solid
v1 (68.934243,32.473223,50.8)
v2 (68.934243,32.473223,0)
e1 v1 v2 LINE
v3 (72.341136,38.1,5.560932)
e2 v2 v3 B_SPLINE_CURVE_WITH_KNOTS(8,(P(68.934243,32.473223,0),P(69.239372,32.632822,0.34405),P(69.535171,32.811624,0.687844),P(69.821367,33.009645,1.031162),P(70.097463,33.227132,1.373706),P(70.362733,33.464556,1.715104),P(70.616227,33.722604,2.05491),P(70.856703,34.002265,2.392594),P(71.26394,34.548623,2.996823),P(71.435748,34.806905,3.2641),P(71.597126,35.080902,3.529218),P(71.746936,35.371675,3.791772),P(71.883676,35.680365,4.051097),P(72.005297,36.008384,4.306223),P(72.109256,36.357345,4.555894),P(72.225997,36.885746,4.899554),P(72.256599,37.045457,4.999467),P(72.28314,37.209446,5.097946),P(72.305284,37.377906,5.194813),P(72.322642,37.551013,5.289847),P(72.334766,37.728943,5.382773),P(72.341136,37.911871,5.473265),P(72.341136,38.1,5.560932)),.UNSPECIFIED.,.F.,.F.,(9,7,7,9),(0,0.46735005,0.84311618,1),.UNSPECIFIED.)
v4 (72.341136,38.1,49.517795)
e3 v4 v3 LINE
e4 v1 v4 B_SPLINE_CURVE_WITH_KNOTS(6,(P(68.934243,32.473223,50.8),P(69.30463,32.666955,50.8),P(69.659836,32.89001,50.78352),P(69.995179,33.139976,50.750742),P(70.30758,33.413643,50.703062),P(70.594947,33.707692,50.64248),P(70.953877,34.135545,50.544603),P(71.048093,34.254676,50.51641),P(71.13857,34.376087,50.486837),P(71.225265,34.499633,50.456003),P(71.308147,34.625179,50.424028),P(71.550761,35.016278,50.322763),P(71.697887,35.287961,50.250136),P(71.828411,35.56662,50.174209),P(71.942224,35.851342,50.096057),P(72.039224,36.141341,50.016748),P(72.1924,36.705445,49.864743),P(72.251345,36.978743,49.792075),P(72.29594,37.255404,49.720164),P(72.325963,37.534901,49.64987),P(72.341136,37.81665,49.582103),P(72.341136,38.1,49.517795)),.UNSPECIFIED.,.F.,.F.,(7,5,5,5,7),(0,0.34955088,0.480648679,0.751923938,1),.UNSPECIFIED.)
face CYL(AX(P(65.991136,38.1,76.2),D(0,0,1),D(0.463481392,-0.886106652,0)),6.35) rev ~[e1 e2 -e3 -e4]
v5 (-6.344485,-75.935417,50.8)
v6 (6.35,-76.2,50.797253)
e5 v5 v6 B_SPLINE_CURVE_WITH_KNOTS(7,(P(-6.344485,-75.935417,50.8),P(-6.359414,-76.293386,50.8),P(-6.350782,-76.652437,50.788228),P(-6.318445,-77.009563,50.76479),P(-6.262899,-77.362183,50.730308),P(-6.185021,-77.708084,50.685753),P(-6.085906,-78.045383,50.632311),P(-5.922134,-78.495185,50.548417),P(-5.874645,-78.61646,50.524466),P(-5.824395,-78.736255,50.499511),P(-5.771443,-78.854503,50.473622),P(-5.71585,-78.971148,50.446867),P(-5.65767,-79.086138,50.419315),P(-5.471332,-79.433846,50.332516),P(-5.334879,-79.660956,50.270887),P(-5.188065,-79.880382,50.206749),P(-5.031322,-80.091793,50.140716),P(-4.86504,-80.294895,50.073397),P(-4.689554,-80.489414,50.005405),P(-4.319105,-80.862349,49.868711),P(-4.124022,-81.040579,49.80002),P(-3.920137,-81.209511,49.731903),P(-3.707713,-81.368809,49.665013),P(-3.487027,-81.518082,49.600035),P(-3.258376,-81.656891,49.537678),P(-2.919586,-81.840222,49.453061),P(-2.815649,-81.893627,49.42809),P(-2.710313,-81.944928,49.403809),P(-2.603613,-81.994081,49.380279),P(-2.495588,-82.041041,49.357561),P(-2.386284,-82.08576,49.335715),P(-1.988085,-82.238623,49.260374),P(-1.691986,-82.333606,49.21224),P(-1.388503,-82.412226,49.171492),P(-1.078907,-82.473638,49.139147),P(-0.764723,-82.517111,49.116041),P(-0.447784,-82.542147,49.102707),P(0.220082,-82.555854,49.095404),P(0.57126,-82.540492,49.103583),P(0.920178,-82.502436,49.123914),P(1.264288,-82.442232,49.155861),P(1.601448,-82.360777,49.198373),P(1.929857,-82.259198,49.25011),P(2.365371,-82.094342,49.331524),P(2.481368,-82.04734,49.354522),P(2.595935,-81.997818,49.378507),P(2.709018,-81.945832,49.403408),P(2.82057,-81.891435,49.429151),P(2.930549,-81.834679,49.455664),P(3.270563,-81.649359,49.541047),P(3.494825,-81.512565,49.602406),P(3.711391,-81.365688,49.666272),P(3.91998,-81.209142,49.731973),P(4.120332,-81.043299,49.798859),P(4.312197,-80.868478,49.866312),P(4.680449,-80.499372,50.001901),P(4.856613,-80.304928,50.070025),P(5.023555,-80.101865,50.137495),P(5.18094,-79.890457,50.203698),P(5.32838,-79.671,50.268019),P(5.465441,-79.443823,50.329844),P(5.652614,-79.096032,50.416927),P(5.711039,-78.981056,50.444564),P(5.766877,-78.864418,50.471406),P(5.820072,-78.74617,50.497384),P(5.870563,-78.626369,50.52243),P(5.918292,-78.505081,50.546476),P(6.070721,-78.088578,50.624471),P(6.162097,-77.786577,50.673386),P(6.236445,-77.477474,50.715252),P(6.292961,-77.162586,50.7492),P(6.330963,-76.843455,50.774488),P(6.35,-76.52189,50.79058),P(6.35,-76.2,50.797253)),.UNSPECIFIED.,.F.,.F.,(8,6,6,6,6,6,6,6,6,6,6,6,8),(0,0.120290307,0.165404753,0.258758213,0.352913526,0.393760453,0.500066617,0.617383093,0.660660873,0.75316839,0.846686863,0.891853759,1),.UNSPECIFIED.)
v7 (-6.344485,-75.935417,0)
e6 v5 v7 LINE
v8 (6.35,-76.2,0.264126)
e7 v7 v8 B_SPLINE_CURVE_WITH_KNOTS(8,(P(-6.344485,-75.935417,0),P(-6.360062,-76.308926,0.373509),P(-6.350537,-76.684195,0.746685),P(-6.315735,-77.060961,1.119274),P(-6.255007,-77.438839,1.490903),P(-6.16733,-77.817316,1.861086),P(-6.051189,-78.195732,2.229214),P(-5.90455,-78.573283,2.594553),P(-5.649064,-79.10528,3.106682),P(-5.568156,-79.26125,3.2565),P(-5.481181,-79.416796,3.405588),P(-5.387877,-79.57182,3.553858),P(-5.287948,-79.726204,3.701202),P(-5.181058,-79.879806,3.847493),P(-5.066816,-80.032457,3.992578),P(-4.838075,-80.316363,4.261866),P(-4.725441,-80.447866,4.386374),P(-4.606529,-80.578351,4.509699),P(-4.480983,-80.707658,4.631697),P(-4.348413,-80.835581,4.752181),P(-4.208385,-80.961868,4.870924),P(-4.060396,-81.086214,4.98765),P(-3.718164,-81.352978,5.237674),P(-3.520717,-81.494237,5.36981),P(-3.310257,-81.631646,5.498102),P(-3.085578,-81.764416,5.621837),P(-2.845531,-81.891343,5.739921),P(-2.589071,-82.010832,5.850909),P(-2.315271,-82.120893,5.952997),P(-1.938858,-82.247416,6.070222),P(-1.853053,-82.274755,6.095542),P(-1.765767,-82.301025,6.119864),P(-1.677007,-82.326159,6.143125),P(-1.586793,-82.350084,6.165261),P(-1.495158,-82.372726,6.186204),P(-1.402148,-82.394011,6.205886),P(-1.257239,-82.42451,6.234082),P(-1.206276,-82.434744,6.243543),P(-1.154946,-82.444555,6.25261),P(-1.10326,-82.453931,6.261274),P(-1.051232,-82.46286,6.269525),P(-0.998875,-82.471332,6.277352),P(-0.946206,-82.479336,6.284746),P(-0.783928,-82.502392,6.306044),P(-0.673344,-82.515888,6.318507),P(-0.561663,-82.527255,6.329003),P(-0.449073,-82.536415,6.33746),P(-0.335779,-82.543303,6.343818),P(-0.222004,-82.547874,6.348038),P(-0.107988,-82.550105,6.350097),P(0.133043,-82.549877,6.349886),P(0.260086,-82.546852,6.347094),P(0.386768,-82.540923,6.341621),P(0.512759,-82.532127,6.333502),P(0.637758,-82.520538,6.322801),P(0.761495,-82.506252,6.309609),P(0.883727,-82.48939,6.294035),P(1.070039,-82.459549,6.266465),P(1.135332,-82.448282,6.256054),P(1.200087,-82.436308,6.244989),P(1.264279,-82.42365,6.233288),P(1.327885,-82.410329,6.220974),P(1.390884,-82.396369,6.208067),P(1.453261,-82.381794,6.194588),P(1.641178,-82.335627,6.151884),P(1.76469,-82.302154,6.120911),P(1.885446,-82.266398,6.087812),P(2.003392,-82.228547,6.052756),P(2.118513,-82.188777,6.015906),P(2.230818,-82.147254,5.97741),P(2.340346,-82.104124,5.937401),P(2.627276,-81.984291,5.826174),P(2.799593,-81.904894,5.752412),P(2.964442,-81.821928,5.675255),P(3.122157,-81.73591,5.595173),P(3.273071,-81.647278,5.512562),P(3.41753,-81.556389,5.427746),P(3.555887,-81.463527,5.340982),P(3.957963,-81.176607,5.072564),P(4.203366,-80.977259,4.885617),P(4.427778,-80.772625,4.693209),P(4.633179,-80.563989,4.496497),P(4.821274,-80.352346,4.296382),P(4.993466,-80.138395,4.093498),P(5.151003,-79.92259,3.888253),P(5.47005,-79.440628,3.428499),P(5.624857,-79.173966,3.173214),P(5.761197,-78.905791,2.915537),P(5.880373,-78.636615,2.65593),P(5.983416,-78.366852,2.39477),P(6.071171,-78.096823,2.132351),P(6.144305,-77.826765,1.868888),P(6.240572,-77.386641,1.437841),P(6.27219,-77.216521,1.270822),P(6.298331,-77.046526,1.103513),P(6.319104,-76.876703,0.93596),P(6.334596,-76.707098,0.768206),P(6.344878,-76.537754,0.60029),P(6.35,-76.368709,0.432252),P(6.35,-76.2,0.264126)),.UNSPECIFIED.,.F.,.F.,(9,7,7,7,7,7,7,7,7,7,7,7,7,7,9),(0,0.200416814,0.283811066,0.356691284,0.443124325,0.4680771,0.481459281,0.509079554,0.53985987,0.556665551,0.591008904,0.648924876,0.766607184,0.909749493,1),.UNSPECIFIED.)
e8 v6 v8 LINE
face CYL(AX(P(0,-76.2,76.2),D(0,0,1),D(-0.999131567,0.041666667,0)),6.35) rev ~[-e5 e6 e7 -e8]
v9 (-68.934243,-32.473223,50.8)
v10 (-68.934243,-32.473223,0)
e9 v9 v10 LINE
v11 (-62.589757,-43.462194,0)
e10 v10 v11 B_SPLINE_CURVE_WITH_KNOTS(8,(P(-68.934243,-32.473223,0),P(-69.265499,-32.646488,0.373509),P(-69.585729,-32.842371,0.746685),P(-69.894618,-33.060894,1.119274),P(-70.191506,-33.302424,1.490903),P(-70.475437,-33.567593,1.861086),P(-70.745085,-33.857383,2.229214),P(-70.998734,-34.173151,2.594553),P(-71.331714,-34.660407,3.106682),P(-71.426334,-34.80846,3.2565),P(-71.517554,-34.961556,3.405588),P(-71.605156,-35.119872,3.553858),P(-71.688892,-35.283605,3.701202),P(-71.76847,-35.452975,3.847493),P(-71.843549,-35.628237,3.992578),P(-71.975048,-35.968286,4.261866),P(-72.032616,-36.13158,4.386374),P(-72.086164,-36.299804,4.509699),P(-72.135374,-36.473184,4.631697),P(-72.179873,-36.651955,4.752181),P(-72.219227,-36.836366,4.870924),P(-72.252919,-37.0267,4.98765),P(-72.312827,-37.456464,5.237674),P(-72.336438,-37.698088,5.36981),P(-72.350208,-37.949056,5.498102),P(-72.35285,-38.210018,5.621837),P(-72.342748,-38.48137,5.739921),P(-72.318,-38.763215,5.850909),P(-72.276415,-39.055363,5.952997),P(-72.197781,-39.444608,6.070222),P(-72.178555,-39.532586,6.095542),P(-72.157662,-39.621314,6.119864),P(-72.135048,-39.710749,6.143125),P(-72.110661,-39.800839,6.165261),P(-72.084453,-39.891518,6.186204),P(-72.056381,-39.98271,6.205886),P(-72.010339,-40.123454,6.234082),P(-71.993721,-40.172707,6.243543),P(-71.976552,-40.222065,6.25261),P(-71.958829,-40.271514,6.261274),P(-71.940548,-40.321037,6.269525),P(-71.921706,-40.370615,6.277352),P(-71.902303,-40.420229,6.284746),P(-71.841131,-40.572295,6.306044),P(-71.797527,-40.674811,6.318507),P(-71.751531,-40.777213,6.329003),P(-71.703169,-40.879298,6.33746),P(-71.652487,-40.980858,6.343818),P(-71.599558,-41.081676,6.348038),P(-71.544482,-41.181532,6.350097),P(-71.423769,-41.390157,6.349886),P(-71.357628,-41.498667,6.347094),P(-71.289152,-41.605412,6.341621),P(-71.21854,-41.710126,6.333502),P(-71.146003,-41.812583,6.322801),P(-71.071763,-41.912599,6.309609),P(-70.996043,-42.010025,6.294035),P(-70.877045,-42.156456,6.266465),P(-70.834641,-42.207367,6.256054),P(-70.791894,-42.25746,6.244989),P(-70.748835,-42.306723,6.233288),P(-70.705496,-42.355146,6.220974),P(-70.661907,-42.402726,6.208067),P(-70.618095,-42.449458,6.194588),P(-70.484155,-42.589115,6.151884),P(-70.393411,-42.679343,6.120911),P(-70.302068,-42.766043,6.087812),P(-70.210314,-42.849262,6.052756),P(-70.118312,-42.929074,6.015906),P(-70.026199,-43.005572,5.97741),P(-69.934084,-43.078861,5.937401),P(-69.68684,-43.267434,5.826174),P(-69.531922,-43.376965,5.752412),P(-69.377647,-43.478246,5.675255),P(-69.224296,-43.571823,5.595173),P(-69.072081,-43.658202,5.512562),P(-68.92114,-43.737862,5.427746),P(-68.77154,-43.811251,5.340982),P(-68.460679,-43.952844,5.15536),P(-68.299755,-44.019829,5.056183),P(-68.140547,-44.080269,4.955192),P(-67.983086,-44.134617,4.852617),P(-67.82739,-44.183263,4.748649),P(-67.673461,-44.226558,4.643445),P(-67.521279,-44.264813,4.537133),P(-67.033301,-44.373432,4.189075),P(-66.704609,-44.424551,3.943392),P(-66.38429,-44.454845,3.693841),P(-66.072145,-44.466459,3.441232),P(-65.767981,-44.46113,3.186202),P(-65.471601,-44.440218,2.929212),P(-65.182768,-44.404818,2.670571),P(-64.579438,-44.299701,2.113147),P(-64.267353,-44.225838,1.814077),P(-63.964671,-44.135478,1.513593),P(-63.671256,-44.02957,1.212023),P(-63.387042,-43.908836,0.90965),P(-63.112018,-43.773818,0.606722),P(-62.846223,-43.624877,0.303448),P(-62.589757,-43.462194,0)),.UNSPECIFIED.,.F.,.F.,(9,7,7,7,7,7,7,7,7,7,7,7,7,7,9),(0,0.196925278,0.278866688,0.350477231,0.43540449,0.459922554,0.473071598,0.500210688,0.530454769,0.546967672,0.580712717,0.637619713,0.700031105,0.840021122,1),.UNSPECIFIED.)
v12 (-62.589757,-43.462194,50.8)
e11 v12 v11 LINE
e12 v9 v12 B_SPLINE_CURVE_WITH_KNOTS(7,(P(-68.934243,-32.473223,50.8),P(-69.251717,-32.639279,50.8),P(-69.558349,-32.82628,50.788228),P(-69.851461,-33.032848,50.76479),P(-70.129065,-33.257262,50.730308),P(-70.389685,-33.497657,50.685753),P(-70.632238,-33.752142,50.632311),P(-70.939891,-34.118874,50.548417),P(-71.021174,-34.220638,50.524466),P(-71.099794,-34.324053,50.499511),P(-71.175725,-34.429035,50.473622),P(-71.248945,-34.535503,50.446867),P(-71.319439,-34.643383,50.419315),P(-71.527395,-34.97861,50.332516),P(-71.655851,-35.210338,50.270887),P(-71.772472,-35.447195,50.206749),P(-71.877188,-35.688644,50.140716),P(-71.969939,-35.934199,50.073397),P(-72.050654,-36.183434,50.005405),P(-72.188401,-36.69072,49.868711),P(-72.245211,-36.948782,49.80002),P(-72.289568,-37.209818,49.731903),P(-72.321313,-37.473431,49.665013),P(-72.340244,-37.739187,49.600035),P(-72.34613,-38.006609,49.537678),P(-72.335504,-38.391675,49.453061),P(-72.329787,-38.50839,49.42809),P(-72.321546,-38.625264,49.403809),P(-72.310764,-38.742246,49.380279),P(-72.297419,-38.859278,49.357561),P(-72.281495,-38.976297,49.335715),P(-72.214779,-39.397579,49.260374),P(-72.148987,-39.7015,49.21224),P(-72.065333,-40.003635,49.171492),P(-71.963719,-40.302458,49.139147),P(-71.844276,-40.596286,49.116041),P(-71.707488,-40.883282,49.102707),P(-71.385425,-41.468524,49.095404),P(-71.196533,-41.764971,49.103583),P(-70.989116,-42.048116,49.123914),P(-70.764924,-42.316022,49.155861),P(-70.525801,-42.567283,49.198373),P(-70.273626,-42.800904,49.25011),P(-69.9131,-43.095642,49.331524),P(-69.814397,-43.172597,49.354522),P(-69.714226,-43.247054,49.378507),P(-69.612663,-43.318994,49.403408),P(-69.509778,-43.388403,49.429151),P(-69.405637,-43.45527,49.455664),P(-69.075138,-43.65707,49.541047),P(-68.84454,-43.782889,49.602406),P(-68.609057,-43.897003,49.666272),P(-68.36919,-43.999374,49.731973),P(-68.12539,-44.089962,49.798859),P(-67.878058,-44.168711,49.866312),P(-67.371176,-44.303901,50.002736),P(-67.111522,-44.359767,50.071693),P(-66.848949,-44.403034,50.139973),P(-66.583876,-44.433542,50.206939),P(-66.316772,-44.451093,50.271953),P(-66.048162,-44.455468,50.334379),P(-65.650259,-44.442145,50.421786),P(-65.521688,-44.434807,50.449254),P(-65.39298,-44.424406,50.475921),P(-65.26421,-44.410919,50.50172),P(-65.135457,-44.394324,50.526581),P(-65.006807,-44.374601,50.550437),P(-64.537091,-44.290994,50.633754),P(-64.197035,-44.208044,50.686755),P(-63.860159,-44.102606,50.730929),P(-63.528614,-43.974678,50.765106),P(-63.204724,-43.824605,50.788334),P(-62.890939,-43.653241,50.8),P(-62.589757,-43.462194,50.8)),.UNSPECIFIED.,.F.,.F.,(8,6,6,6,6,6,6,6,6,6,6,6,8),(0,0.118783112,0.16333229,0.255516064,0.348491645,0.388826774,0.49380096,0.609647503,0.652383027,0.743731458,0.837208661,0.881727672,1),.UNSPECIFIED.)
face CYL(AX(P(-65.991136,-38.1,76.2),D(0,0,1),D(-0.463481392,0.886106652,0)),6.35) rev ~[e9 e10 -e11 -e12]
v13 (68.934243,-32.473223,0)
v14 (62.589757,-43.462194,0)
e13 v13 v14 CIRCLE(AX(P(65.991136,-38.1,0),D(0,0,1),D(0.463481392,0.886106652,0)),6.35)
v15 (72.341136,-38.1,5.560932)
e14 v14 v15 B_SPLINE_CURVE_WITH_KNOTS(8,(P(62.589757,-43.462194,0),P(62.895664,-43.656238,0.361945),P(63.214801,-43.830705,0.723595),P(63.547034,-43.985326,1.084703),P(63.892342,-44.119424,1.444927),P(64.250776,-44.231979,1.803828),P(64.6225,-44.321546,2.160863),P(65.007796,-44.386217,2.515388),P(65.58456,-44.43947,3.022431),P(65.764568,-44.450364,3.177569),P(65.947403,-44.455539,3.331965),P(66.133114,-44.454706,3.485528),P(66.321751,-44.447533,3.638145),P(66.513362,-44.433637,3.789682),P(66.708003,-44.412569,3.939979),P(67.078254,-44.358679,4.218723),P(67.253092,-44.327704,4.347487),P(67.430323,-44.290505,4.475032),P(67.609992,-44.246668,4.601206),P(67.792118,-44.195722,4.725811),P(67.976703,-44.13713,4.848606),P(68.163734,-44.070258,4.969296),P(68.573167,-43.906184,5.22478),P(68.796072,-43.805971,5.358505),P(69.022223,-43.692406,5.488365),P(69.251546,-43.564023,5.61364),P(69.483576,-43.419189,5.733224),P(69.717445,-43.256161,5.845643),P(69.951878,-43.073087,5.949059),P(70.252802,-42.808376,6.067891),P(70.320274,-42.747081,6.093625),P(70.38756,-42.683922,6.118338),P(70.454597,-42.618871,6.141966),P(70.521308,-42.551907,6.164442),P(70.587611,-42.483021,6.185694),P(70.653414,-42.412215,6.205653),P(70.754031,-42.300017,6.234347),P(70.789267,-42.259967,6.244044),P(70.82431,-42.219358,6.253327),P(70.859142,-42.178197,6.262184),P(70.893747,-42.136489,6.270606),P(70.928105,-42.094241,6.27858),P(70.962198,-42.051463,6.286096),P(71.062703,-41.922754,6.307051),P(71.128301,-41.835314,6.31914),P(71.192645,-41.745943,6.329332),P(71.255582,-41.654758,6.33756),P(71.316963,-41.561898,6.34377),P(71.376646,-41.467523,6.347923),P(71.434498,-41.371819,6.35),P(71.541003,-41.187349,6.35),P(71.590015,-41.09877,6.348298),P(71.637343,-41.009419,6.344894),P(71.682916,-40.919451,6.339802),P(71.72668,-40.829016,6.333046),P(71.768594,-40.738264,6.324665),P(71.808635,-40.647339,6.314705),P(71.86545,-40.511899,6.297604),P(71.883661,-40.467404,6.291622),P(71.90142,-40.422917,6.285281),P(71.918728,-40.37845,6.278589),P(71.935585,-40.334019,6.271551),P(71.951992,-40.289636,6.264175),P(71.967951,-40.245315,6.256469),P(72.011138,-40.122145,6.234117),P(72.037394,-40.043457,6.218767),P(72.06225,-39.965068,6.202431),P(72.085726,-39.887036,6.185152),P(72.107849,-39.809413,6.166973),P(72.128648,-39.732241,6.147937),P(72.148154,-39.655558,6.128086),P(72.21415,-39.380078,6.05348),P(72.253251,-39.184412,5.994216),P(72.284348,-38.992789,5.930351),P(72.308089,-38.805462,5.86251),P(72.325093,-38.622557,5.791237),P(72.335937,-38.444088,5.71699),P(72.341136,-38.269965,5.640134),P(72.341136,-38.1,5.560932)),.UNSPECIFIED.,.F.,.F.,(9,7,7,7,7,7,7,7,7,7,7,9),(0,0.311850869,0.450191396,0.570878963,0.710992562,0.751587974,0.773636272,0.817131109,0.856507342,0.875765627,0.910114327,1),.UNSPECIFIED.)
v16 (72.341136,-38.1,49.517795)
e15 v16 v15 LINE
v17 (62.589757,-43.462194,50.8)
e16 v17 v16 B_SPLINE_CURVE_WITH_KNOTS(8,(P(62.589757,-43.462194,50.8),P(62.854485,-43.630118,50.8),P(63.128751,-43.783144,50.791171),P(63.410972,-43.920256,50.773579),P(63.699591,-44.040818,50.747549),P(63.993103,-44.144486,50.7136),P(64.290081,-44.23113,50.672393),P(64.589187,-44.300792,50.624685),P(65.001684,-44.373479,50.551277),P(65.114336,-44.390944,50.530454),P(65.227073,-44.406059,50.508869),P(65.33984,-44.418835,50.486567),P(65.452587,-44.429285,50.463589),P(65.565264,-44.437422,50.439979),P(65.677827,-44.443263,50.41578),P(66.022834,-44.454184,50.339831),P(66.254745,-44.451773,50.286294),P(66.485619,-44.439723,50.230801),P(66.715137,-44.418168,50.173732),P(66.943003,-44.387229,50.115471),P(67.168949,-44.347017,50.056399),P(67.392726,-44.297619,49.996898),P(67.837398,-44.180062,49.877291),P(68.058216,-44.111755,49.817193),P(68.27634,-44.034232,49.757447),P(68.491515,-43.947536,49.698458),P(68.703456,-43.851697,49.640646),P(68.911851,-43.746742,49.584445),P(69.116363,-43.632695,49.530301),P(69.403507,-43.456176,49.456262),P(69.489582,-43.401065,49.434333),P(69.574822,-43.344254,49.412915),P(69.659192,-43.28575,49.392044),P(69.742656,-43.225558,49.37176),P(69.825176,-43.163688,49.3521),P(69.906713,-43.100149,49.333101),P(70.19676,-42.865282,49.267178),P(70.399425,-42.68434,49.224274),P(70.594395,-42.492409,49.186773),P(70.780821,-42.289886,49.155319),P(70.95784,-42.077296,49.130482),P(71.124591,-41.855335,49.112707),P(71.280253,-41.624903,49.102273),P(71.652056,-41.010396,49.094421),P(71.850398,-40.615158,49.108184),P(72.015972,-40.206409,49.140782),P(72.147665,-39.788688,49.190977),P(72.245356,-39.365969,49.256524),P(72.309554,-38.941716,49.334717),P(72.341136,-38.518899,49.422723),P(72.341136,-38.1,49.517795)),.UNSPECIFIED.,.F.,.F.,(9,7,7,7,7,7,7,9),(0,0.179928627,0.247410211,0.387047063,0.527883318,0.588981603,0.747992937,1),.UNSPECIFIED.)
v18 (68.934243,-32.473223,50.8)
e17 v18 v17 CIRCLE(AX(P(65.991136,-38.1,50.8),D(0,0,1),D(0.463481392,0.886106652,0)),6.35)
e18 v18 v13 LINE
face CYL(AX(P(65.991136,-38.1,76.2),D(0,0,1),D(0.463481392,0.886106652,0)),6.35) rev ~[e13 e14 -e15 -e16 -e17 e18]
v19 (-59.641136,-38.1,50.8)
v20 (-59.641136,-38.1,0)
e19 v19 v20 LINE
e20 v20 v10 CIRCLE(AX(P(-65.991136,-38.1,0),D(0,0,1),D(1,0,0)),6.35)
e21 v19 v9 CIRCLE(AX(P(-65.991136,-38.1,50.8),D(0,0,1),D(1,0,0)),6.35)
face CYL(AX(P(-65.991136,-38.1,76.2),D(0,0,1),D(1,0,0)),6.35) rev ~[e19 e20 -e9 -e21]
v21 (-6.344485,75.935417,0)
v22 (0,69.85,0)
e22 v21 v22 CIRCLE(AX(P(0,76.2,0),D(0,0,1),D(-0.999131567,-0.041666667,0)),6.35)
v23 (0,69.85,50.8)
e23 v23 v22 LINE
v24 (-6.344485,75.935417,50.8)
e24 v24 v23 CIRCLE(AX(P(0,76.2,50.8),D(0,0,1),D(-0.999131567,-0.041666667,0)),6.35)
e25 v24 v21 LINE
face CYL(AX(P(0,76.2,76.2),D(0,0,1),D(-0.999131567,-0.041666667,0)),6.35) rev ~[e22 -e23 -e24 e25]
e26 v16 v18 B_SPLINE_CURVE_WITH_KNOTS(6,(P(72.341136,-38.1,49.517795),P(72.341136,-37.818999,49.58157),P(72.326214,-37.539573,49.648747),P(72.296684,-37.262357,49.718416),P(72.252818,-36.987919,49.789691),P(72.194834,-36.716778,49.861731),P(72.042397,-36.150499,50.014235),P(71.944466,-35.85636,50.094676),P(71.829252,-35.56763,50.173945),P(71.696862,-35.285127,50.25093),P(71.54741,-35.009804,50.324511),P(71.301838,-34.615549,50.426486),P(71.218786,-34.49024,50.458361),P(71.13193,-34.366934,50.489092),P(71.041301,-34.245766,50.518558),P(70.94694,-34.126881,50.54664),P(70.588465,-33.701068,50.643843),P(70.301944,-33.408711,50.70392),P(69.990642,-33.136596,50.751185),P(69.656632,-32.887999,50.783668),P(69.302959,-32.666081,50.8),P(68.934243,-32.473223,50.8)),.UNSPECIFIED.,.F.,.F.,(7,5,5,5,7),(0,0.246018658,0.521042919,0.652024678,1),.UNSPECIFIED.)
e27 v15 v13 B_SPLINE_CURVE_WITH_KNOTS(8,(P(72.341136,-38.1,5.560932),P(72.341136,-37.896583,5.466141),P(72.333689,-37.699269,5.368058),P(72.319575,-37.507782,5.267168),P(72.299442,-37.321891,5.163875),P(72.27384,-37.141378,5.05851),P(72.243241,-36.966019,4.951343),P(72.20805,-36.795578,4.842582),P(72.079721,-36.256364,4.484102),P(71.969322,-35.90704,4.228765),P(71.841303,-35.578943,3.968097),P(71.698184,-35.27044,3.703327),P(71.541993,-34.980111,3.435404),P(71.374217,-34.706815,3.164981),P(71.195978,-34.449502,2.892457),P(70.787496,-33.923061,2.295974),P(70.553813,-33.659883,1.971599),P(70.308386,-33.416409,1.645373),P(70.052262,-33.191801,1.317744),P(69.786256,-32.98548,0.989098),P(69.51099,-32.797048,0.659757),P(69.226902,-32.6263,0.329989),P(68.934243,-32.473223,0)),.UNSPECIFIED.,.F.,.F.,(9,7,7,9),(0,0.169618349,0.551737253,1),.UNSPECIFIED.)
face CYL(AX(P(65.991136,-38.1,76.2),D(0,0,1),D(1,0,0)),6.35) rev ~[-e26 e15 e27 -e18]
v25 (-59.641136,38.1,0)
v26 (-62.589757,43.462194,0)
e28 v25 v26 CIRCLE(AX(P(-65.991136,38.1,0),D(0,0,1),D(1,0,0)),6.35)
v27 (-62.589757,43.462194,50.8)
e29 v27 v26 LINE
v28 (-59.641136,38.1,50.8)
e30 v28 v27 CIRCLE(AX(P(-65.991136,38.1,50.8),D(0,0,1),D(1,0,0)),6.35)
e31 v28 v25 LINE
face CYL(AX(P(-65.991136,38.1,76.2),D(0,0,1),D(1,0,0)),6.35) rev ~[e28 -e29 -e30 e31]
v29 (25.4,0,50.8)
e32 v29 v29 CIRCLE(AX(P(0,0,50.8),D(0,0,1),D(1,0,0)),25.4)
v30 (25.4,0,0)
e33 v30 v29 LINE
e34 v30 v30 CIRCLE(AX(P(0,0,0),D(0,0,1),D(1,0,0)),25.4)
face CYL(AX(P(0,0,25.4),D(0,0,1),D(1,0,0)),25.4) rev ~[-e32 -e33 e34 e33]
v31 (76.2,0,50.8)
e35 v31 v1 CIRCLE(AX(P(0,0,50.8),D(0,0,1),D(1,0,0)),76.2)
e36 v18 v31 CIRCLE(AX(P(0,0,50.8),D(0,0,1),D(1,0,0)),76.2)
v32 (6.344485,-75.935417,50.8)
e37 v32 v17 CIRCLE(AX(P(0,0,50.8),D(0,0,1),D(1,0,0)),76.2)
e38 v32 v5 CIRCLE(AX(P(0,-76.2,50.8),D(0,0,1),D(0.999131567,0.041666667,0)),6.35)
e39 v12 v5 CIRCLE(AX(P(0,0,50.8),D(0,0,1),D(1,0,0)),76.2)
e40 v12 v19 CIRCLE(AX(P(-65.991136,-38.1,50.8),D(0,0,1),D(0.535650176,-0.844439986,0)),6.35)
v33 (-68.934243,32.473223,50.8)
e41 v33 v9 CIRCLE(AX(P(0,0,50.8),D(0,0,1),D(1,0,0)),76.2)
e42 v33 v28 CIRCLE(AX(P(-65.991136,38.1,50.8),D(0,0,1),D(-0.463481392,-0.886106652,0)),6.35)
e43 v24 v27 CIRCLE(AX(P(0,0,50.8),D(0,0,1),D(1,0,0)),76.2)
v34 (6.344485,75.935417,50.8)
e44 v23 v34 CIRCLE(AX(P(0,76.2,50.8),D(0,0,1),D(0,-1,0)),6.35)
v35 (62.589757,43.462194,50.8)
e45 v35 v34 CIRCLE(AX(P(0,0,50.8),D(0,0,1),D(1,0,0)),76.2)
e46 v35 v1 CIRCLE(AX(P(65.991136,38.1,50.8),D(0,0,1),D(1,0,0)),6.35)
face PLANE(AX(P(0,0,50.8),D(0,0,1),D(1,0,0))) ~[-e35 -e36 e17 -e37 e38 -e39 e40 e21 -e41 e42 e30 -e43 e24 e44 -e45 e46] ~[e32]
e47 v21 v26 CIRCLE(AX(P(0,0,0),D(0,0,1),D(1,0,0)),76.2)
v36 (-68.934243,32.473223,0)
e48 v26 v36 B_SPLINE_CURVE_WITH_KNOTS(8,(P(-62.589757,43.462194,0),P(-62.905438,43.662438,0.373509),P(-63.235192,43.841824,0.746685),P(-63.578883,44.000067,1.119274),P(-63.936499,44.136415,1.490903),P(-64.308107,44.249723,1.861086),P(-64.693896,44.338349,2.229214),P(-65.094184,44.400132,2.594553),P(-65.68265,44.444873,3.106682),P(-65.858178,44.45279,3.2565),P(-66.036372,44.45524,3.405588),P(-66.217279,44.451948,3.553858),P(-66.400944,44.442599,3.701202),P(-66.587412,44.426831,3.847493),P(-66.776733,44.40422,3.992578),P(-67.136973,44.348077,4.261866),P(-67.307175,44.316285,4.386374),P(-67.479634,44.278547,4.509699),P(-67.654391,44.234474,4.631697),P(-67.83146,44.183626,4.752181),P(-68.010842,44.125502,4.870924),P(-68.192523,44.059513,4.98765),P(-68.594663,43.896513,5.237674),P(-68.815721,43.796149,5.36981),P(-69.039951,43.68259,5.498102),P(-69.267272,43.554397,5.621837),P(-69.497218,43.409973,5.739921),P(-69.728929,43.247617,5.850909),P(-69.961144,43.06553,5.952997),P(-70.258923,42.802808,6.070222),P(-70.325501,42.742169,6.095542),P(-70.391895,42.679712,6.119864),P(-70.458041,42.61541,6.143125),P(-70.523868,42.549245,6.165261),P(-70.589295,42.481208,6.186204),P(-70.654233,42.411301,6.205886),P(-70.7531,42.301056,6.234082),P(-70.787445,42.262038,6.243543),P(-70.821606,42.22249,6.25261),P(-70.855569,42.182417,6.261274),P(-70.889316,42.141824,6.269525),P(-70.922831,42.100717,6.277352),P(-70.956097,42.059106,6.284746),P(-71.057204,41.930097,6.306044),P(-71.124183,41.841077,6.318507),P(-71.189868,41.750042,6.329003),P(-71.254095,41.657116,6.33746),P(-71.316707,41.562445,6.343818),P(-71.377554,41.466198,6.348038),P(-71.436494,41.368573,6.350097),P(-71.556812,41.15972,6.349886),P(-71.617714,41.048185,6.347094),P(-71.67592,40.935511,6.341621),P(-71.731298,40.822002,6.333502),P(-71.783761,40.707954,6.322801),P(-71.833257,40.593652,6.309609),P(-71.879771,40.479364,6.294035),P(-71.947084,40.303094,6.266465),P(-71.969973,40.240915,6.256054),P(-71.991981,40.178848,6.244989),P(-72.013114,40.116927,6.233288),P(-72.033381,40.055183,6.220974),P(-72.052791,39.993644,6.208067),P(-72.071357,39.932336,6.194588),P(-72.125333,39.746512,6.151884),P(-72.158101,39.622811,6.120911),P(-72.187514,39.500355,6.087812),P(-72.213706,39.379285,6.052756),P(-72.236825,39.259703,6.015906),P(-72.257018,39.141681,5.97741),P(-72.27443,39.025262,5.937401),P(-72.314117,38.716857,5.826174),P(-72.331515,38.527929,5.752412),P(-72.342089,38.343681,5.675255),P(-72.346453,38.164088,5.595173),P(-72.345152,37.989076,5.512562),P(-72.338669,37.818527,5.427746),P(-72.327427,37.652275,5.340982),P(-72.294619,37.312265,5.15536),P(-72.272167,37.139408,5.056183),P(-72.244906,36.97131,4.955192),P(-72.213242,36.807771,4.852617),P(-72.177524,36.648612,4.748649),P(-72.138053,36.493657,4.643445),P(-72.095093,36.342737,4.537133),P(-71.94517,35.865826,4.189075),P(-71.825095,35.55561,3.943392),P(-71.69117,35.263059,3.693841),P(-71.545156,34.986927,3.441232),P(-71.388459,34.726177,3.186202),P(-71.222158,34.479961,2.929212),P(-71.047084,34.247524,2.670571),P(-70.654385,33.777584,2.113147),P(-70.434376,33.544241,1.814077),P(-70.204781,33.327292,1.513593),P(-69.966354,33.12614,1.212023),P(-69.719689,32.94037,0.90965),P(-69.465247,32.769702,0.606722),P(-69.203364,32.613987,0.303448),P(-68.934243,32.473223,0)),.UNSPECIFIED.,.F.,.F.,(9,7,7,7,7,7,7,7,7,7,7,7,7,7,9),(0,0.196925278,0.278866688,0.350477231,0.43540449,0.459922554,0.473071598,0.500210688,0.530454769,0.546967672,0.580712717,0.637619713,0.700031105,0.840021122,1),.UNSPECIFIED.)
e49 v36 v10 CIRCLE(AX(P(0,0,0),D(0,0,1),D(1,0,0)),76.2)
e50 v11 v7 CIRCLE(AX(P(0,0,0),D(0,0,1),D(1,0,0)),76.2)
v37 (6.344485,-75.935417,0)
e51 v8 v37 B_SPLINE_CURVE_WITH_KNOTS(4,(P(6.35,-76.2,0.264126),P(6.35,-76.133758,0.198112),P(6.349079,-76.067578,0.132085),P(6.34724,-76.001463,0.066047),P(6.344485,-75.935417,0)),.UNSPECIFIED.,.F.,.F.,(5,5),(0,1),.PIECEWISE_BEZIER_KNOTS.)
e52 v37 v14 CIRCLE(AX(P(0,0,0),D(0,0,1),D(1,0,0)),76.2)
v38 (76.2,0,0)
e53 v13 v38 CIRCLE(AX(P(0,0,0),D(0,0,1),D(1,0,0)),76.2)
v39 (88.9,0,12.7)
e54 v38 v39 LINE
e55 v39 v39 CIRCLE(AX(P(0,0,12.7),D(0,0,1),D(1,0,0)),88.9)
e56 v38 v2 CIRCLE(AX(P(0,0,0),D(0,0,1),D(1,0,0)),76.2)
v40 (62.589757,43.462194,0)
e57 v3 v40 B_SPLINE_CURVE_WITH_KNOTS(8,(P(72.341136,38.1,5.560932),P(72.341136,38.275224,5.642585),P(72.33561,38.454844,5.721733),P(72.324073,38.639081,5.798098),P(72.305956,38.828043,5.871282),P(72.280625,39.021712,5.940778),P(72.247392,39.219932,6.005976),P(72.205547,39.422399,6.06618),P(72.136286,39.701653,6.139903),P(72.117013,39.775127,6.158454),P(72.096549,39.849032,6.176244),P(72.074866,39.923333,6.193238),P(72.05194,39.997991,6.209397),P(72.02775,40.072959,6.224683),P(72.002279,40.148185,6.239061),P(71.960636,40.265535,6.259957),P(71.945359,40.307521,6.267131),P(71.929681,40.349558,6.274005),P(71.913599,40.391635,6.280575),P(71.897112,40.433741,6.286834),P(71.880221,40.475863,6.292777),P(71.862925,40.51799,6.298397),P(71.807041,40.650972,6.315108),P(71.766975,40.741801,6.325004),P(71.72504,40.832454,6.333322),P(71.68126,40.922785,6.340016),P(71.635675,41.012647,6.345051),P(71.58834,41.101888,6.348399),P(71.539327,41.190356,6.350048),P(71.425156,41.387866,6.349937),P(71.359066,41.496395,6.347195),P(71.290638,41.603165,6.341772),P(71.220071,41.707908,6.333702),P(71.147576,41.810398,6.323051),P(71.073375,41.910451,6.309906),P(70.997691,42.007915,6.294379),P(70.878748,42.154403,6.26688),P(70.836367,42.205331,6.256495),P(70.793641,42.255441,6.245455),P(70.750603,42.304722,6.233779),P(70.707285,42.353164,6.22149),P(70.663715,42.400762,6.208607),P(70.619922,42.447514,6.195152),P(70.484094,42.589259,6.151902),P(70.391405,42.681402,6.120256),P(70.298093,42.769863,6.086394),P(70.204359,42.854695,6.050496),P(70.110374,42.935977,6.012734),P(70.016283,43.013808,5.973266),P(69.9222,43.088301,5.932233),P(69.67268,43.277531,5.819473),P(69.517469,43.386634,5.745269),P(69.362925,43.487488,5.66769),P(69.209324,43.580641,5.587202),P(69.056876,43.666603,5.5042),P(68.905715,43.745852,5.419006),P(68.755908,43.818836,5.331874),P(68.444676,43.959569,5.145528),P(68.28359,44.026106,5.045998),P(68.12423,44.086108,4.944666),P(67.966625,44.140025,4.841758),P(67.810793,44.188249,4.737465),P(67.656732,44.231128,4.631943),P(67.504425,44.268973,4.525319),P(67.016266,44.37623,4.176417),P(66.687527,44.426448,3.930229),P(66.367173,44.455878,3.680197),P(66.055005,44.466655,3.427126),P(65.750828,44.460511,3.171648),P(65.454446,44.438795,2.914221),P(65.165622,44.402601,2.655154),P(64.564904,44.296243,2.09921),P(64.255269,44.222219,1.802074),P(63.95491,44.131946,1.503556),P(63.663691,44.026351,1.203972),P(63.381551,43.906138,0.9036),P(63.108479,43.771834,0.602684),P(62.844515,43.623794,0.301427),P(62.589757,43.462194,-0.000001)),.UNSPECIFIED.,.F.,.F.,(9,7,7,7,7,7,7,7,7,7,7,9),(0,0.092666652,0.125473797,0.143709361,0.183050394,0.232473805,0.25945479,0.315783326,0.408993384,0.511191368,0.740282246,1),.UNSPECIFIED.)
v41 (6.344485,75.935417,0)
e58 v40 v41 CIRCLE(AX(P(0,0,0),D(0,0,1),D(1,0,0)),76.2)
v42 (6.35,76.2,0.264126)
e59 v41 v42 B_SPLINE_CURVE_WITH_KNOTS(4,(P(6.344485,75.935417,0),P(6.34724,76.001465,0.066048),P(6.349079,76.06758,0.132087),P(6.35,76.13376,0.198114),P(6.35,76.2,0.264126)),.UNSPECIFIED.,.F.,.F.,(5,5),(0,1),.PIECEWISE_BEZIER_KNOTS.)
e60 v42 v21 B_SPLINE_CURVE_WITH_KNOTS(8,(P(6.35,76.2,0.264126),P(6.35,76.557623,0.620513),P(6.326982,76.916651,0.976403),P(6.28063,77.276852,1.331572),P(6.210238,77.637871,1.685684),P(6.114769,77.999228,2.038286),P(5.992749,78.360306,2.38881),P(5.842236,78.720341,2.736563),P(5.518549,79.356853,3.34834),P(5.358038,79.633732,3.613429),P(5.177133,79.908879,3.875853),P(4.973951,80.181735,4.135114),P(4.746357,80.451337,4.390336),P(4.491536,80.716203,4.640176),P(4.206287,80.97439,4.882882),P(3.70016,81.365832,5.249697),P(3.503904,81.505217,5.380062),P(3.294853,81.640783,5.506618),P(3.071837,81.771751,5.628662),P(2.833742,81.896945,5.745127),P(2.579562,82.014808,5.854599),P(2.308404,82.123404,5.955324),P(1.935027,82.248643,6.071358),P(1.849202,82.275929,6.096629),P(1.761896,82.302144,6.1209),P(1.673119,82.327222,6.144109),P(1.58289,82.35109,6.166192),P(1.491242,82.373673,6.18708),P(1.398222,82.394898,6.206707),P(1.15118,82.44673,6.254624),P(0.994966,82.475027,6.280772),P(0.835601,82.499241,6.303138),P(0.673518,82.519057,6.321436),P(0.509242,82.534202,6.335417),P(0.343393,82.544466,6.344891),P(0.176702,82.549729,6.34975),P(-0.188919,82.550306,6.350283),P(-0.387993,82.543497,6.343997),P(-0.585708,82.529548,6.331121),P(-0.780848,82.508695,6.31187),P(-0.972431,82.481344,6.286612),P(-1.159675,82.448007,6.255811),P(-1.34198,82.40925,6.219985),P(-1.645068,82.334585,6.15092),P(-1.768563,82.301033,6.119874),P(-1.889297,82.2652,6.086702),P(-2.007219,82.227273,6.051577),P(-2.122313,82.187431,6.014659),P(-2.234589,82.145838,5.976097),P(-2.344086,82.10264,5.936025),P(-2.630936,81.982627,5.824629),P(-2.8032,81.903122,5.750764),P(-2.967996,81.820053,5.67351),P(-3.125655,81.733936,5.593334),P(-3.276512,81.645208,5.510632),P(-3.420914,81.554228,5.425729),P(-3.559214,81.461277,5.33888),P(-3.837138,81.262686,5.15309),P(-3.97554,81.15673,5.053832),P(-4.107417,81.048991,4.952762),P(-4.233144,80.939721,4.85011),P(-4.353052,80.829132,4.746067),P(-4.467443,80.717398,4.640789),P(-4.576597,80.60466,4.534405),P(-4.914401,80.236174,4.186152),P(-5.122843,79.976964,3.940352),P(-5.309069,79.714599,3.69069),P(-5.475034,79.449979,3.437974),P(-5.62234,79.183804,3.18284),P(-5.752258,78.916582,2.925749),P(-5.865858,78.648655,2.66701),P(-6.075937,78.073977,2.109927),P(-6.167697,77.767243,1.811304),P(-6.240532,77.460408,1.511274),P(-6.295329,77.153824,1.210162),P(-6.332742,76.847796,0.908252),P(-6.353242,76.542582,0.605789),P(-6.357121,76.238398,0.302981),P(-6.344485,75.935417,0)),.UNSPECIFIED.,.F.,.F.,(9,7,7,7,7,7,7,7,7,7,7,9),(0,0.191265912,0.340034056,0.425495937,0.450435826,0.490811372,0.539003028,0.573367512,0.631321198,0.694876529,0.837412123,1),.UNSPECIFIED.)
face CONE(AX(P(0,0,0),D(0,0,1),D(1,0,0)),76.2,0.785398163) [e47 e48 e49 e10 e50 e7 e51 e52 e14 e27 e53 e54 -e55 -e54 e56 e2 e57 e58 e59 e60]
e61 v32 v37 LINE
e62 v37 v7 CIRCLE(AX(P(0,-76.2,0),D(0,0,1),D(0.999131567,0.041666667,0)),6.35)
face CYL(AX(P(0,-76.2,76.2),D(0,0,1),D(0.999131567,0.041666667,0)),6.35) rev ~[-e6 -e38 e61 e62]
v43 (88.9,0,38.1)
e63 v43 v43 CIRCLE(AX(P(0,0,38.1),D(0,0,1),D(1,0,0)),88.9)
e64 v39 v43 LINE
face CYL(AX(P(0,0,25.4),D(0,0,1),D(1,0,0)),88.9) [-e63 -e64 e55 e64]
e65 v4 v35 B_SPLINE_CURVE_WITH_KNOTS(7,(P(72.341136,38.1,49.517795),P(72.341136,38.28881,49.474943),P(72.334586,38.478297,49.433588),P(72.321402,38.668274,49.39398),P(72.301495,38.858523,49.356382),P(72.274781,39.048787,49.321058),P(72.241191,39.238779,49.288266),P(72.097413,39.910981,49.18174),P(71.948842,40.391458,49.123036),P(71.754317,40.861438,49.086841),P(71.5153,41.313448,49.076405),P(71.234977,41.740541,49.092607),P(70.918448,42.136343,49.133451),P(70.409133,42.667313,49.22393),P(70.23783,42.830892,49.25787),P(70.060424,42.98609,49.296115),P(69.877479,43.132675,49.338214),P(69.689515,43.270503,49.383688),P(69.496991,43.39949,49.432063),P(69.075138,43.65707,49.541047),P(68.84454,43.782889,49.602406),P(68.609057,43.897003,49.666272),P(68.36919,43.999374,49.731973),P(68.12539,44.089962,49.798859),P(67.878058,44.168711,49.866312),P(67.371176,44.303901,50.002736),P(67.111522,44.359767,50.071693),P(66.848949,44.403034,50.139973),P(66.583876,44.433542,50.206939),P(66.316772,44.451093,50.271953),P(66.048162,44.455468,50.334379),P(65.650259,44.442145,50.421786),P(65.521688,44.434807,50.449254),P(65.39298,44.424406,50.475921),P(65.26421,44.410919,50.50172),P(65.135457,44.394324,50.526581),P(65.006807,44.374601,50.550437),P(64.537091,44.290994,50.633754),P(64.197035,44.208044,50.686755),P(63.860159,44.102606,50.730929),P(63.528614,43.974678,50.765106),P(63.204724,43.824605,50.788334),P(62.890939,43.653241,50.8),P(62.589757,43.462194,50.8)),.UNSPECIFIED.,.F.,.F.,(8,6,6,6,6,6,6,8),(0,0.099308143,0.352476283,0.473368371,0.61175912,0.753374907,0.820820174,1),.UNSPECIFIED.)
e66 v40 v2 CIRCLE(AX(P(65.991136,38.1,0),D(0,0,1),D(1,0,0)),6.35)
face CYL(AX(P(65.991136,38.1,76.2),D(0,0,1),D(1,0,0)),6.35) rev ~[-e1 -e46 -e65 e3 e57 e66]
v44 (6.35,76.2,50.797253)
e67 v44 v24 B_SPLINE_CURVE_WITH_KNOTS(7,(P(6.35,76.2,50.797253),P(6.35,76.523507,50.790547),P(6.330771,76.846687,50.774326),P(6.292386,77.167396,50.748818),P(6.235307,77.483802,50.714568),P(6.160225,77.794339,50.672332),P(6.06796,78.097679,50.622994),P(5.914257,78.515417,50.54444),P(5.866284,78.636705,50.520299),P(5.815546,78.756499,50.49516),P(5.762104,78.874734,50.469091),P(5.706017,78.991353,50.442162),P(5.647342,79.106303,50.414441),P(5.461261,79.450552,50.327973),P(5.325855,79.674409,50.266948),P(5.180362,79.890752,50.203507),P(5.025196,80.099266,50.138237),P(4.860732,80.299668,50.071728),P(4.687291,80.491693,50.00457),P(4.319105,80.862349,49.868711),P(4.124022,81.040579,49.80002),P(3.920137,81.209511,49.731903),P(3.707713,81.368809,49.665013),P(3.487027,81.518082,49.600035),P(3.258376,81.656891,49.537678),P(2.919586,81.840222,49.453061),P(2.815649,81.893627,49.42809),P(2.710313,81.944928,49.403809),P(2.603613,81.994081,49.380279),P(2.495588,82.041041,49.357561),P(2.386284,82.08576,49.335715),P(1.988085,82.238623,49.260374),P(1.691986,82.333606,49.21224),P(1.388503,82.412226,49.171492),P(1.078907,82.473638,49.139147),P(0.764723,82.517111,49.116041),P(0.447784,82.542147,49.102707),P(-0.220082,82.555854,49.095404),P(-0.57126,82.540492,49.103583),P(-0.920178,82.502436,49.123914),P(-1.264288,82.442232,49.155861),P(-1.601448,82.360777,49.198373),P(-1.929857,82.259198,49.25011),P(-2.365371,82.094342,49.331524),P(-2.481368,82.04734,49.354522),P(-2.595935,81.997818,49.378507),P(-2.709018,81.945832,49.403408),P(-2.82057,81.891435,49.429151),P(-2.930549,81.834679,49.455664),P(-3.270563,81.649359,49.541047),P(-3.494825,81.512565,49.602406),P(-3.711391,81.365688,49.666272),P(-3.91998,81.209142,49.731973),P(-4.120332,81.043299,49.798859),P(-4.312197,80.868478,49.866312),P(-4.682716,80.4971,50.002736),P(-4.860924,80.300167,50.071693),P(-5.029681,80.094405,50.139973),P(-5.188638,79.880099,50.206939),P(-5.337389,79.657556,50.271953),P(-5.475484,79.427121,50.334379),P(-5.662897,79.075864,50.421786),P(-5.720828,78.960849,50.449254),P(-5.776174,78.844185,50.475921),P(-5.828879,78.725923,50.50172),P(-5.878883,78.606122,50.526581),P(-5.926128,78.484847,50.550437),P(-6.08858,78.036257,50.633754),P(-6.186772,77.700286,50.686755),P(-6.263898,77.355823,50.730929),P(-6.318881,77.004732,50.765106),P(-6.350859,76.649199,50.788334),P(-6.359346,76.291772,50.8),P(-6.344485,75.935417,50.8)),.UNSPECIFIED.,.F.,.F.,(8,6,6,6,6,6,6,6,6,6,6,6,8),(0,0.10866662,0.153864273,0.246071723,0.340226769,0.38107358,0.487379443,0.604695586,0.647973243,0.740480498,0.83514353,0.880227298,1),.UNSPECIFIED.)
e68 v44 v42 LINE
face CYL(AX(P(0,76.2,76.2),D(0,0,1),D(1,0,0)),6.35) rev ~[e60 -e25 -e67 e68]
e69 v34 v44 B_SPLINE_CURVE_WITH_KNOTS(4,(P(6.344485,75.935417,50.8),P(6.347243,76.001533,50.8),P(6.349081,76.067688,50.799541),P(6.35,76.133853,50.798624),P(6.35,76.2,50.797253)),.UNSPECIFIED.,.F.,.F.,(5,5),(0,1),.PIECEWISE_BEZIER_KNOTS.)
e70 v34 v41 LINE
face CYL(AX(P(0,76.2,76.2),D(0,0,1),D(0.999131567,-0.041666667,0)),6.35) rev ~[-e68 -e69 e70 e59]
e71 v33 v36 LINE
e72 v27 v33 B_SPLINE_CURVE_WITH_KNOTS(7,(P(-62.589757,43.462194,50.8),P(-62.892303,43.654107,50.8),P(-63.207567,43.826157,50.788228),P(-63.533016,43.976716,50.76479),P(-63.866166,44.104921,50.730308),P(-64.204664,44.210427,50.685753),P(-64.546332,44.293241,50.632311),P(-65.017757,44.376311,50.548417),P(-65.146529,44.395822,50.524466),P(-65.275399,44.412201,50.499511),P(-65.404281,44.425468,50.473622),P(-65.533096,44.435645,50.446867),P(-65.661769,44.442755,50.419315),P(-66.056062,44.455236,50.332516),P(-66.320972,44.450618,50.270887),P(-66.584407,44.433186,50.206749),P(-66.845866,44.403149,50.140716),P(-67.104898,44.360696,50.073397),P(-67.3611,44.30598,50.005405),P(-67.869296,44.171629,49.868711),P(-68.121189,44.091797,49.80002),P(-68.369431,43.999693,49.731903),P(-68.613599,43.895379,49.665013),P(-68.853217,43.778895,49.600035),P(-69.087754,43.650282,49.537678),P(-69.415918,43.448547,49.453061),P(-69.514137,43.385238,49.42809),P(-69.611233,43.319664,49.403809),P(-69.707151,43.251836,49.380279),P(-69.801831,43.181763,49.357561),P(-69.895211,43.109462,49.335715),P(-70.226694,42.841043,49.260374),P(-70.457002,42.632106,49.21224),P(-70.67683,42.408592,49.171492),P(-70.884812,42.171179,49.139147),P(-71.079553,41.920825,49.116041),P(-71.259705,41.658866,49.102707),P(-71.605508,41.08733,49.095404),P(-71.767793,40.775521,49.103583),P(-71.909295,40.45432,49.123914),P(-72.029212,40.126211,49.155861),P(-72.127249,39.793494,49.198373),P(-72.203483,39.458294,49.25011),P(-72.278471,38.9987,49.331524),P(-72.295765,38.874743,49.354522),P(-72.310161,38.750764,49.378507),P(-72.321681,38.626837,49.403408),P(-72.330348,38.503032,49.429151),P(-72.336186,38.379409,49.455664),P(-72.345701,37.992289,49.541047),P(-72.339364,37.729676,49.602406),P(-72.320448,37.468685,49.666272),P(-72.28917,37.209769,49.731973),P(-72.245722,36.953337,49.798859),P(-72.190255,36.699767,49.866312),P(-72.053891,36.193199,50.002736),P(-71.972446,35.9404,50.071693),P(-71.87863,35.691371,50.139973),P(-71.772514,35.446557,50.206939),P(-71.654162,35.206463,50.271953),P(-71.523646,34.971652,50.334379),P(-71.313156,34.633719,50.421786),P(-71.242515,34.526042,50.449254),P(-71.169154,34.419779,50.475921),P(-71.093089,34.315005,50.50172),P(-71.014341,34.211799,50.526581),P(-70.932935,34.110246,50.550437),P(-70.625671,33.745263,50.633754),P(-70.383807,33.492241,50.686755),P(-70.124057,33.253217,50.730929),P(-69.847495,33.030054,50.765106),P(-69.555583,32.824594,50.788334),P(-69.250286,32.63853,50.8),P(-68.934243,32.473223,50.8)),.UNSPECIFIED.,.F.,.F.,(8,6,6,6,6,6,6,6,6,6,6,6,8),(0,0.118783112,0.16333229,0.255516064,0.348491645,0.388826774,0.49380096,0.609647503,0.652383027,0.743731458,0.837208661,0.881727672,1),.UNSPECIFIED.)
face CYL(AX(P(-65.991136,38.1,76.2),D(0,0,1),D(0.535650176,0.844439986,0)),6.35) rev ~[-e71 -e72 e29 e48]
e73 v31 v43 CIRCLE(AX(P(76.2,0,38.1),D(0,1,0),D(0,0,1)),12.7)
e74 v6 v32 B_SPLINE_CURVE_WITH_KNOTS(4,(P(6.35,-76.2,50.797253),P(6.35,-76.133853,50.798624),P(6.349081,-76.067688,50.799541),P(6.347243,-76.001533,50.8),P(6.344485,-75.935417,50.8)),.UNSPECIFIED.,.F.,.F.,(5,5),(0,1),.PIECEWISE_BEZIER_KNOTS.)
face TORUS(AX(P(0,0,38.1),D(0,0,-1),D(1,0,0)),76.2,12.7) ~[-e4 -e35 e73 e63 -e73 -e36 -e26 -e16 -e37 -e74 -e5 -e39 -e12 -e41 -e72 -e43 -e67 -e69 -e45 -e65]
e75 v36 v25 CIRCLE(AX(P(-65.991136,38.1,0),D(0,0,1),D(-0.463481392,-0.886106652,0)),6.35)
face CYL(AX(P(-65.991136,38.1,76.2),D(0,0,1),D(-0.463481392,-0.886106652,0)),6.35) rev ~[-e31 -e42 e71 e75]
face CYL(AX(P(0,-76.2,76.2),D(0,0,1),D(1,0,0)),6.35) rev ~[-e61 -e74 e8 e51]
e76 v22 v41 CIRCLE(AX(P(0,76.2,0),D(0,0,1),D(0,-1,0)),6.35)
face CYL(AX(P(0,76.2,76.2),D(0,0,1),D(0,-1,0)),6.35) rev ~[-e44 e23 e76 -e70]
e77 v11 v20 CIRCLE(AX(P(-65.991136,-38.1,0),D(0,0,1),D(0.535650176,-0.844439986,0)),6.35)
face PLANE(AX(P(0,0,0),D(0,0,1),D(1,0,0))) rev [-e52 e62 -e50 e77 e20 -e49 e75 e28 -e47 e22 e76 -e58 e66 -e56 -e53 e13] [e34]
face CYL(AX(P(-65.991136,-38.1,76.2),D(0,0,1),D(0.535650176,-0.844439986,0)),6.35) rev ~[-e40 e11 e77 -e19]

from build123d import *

# Parameters (mm, degrees)
F0_W     = 63.5
F0_H     = 50.8
F4_DEPTH = 76.201


# Not quite as in the source:
# - a fillet or chamfer that OpenCascade refuses, or shapes differently, is made with other operations: its cross-section is extruded or revolved along the edge and cut away or added


with BuildPart() as f1:
    # F0 (on Front) → F1 (revolve)
    with BuildSketch(Plane.XZ):
        with Locations((57.15, 25.4)):
            Rectangle(F0_W, F0_H)
    revolve(axis=Axis((0, 0, 63.5), (0, 0, 1)))

    # F3 (on offset) → F4 (cut, through all)
    with BuildSketch(Plane.XY.offset(76.2)):
        with BuildLine():
            ThreePointArc((0, 76.2), (3.175, 76.1338254326), (6.3444854527, 75.9354166667))
            ThreePointArc((6.3444854527, 75.9354166667), (6.3486212135, 76.0676796024), (6.35, 76.2))
            ThreePointArc((6.35, 76.2), (-0.1323203976, 82.5486212135), (-6.3444854527, 75.9354166667))
            ThreePointArc((-6.3444854527, 75.9354166667), (-3.175, 76.1338254326), (0, 76.2))
        make_face()
        with BuildLine():
            Line((0, 69.85), (0, 76.2))
            ThreePointArc((0, 76.2), (-3.175, 76.1338254326), (-6.3444854527, 75.9354166667))
            ThreePointArc((-6.3444854527, 75.9354166667), (-4.3955884608, 71.6172822383), (0, 69.85))
        make_face()
        with BuildLine():
            ThreePointArc((0, 69.85), (4.3955884608, 71.6172822383), (6.3444854527, 75.9354166667))
            ThreePointArc((6.3444854527, 75.9354166667), (3.175, 76.1338254326), (0, 76.2))
            Line((0, 76.2), (0, 69.85))
        make_face()
        with BuildLine():
            ThreePointArc((62.5897571539, 43.4621939093), (65.9911357684, 38.1), (68.9342426066, 32.4732227573))
            ThreePointArc((68.9342426066, 32.4732227573), (71.4230428194, 34.8110965675), (72.3411357684, 38.1))
            ThreePointArc((72.3411357684, 38.1), (69.0508535493, 43.6642274487), (62.5897571539, 43.4621939093))
        make_face()
        with BuildLine():
            ThreePointArc((62.5897571539, 43.4621939093), (60.4918744543, 34.925), (68.9342426066, 32.4732227573))
            ThreePointArc((68.9342426066, 32.4732227573), (65.9911357684, 38.1), (62.5897571539, 43.4621939093))
        make_face()
        with BuildLine():
            ThreePointArc((62.5897571539, -43.4621939093), (65.9911357684, -38.1), (68.9342426066, -32.4732227573))
            ThreePointArc((68.9342426066, -32.4732227573), (60.4918744543, -34.925), (62.5897571539, -43.4621939093))
        make_face()
        with BuildLine():
            ThreePointArc((72.3411357684, -38.1), (71.4230428194, -34.8110965675), (68.9342426066, -32.4732227573))
            ThreePointArc((68.9342426066, -32.4732227573), (65.9911357684, -38.1), (62.5897571539, -43.4621939093))
            ThreePointArc((62.5897571539, -43.4621939093), (69.0508535493, -43.6642274487), (72.3411357684, -38.1))
        make_face()
        with BuildLine():
            ThreePointArc((-6.3444854527, -75.9354166667), (0, -76.2), (6.3444854527, -75.9354166667))
            ThreePointArc((6.3444854527, -75.9354166667), (0, -69.85), (-6.3444854527, -75.9354166667))
        make_face()
        with BuildLine():
            ThreePointArc((6.35, -76.2), (6.3486212135, -76.0676796024), (6.3444854527, -75.9354166667))
            ThreePointArc((6.3444854527, -75.9354166667), (0, -76.2), (-6.3444854527, -75.9354166667))
            ThreePointArc((-6.3444854527, -75.9354166667), (-0.1323203976, -82.5486212135), (6.35, -76.2))
        make_face()
        with BuildLine():
            ThreePointArc((-68.9342426066, -32.4732227573), (-71.4903970824, -41.275), (-62.5897571539, -43.4621939093))
            ThreePointArc((-62.5897571539, -43.4621939093), (-65.9911357684, -38.1), (-68.9342426066, -32.4732227573))
        make_face()
        with BuildLine():
            ThreePointArc((-68.9342426066, -32.4732227573), (-65.9911357684, -38.1), (-62.5897571539, -43.4621939093))
            ThreePointArc((-62.5897571539, -43.4621939093), (-60.4269083197, -41.159717781), (-59.6411357684, -38.1))
            ThreePointArc((-59.6411357684, -38.1), (-62.7022323358, -32.6680929489), (-68.9342426066, -32.4732227573))
        make_face()
        with BuildLine():
            ThreePointArc((-68.9342426066, 32.4732227573), (-65.9911357684, 38.1), (-62.5897571539, 43.4621939093))
            ThreePointArc((-62.5897571539, 43.4621939093), (-71.4903970824, 41.275), (-68.9342426066, 32.4732227573))
        make_face()
        with BuildLine():
            ThreePointArc((-59.6411357684, 38.1), (-60.4269083197, 41.159717781), (-62.5897571539, 43.4621939093))
            ThreePointArc((-62.5897571539, 43.4621939093), (-65.9911357684, 38.1), (-68.9342426066, 32.4732227573))
            ThreePointArc((-68.9342426066, 32.4732227573), (-62.7022323358, 32.6680929489), (-59.6411357684, 38.1))
        make_face()
    extrude(amount=-F4_DEPTH, mode=Mode.SUBTRACT)

    # F5: fillet of radius 12.7 on 1 edges, made by hand

    # F5_s1 → F5_t2 (revolve, cut)
    with BuildSketch(Plane.XZ):
        with BuildLine():
            ThreePointArc((76.2, 50.8), (85.1802561211, 47.0802561211), (88.9, 38.1))
            Line((88.9, 38.1), (88.9, 50.8))
            Line((88.9, 50.8), (76.2, 50.8))
        make_face()
    revolve(axis=Axis((0, 0, 50.8), (0, 0, 1)), mode=Mode.SUBTRACT)

    # F6: chamfer of 12.7 on 3 edges, made by hand

    # F6_s1 → F6_t2 (revolve, cut)
    with BuildSketch(Plane.XZ):
        Polygon((76.2, 0), (88.9, 12.7), (88.9, 0), align=None)
    revolve(axis=Axis((0, 0, 0), (0, 0, 1)), mode=Mode.SUBTRACT)


solid = f1.part
